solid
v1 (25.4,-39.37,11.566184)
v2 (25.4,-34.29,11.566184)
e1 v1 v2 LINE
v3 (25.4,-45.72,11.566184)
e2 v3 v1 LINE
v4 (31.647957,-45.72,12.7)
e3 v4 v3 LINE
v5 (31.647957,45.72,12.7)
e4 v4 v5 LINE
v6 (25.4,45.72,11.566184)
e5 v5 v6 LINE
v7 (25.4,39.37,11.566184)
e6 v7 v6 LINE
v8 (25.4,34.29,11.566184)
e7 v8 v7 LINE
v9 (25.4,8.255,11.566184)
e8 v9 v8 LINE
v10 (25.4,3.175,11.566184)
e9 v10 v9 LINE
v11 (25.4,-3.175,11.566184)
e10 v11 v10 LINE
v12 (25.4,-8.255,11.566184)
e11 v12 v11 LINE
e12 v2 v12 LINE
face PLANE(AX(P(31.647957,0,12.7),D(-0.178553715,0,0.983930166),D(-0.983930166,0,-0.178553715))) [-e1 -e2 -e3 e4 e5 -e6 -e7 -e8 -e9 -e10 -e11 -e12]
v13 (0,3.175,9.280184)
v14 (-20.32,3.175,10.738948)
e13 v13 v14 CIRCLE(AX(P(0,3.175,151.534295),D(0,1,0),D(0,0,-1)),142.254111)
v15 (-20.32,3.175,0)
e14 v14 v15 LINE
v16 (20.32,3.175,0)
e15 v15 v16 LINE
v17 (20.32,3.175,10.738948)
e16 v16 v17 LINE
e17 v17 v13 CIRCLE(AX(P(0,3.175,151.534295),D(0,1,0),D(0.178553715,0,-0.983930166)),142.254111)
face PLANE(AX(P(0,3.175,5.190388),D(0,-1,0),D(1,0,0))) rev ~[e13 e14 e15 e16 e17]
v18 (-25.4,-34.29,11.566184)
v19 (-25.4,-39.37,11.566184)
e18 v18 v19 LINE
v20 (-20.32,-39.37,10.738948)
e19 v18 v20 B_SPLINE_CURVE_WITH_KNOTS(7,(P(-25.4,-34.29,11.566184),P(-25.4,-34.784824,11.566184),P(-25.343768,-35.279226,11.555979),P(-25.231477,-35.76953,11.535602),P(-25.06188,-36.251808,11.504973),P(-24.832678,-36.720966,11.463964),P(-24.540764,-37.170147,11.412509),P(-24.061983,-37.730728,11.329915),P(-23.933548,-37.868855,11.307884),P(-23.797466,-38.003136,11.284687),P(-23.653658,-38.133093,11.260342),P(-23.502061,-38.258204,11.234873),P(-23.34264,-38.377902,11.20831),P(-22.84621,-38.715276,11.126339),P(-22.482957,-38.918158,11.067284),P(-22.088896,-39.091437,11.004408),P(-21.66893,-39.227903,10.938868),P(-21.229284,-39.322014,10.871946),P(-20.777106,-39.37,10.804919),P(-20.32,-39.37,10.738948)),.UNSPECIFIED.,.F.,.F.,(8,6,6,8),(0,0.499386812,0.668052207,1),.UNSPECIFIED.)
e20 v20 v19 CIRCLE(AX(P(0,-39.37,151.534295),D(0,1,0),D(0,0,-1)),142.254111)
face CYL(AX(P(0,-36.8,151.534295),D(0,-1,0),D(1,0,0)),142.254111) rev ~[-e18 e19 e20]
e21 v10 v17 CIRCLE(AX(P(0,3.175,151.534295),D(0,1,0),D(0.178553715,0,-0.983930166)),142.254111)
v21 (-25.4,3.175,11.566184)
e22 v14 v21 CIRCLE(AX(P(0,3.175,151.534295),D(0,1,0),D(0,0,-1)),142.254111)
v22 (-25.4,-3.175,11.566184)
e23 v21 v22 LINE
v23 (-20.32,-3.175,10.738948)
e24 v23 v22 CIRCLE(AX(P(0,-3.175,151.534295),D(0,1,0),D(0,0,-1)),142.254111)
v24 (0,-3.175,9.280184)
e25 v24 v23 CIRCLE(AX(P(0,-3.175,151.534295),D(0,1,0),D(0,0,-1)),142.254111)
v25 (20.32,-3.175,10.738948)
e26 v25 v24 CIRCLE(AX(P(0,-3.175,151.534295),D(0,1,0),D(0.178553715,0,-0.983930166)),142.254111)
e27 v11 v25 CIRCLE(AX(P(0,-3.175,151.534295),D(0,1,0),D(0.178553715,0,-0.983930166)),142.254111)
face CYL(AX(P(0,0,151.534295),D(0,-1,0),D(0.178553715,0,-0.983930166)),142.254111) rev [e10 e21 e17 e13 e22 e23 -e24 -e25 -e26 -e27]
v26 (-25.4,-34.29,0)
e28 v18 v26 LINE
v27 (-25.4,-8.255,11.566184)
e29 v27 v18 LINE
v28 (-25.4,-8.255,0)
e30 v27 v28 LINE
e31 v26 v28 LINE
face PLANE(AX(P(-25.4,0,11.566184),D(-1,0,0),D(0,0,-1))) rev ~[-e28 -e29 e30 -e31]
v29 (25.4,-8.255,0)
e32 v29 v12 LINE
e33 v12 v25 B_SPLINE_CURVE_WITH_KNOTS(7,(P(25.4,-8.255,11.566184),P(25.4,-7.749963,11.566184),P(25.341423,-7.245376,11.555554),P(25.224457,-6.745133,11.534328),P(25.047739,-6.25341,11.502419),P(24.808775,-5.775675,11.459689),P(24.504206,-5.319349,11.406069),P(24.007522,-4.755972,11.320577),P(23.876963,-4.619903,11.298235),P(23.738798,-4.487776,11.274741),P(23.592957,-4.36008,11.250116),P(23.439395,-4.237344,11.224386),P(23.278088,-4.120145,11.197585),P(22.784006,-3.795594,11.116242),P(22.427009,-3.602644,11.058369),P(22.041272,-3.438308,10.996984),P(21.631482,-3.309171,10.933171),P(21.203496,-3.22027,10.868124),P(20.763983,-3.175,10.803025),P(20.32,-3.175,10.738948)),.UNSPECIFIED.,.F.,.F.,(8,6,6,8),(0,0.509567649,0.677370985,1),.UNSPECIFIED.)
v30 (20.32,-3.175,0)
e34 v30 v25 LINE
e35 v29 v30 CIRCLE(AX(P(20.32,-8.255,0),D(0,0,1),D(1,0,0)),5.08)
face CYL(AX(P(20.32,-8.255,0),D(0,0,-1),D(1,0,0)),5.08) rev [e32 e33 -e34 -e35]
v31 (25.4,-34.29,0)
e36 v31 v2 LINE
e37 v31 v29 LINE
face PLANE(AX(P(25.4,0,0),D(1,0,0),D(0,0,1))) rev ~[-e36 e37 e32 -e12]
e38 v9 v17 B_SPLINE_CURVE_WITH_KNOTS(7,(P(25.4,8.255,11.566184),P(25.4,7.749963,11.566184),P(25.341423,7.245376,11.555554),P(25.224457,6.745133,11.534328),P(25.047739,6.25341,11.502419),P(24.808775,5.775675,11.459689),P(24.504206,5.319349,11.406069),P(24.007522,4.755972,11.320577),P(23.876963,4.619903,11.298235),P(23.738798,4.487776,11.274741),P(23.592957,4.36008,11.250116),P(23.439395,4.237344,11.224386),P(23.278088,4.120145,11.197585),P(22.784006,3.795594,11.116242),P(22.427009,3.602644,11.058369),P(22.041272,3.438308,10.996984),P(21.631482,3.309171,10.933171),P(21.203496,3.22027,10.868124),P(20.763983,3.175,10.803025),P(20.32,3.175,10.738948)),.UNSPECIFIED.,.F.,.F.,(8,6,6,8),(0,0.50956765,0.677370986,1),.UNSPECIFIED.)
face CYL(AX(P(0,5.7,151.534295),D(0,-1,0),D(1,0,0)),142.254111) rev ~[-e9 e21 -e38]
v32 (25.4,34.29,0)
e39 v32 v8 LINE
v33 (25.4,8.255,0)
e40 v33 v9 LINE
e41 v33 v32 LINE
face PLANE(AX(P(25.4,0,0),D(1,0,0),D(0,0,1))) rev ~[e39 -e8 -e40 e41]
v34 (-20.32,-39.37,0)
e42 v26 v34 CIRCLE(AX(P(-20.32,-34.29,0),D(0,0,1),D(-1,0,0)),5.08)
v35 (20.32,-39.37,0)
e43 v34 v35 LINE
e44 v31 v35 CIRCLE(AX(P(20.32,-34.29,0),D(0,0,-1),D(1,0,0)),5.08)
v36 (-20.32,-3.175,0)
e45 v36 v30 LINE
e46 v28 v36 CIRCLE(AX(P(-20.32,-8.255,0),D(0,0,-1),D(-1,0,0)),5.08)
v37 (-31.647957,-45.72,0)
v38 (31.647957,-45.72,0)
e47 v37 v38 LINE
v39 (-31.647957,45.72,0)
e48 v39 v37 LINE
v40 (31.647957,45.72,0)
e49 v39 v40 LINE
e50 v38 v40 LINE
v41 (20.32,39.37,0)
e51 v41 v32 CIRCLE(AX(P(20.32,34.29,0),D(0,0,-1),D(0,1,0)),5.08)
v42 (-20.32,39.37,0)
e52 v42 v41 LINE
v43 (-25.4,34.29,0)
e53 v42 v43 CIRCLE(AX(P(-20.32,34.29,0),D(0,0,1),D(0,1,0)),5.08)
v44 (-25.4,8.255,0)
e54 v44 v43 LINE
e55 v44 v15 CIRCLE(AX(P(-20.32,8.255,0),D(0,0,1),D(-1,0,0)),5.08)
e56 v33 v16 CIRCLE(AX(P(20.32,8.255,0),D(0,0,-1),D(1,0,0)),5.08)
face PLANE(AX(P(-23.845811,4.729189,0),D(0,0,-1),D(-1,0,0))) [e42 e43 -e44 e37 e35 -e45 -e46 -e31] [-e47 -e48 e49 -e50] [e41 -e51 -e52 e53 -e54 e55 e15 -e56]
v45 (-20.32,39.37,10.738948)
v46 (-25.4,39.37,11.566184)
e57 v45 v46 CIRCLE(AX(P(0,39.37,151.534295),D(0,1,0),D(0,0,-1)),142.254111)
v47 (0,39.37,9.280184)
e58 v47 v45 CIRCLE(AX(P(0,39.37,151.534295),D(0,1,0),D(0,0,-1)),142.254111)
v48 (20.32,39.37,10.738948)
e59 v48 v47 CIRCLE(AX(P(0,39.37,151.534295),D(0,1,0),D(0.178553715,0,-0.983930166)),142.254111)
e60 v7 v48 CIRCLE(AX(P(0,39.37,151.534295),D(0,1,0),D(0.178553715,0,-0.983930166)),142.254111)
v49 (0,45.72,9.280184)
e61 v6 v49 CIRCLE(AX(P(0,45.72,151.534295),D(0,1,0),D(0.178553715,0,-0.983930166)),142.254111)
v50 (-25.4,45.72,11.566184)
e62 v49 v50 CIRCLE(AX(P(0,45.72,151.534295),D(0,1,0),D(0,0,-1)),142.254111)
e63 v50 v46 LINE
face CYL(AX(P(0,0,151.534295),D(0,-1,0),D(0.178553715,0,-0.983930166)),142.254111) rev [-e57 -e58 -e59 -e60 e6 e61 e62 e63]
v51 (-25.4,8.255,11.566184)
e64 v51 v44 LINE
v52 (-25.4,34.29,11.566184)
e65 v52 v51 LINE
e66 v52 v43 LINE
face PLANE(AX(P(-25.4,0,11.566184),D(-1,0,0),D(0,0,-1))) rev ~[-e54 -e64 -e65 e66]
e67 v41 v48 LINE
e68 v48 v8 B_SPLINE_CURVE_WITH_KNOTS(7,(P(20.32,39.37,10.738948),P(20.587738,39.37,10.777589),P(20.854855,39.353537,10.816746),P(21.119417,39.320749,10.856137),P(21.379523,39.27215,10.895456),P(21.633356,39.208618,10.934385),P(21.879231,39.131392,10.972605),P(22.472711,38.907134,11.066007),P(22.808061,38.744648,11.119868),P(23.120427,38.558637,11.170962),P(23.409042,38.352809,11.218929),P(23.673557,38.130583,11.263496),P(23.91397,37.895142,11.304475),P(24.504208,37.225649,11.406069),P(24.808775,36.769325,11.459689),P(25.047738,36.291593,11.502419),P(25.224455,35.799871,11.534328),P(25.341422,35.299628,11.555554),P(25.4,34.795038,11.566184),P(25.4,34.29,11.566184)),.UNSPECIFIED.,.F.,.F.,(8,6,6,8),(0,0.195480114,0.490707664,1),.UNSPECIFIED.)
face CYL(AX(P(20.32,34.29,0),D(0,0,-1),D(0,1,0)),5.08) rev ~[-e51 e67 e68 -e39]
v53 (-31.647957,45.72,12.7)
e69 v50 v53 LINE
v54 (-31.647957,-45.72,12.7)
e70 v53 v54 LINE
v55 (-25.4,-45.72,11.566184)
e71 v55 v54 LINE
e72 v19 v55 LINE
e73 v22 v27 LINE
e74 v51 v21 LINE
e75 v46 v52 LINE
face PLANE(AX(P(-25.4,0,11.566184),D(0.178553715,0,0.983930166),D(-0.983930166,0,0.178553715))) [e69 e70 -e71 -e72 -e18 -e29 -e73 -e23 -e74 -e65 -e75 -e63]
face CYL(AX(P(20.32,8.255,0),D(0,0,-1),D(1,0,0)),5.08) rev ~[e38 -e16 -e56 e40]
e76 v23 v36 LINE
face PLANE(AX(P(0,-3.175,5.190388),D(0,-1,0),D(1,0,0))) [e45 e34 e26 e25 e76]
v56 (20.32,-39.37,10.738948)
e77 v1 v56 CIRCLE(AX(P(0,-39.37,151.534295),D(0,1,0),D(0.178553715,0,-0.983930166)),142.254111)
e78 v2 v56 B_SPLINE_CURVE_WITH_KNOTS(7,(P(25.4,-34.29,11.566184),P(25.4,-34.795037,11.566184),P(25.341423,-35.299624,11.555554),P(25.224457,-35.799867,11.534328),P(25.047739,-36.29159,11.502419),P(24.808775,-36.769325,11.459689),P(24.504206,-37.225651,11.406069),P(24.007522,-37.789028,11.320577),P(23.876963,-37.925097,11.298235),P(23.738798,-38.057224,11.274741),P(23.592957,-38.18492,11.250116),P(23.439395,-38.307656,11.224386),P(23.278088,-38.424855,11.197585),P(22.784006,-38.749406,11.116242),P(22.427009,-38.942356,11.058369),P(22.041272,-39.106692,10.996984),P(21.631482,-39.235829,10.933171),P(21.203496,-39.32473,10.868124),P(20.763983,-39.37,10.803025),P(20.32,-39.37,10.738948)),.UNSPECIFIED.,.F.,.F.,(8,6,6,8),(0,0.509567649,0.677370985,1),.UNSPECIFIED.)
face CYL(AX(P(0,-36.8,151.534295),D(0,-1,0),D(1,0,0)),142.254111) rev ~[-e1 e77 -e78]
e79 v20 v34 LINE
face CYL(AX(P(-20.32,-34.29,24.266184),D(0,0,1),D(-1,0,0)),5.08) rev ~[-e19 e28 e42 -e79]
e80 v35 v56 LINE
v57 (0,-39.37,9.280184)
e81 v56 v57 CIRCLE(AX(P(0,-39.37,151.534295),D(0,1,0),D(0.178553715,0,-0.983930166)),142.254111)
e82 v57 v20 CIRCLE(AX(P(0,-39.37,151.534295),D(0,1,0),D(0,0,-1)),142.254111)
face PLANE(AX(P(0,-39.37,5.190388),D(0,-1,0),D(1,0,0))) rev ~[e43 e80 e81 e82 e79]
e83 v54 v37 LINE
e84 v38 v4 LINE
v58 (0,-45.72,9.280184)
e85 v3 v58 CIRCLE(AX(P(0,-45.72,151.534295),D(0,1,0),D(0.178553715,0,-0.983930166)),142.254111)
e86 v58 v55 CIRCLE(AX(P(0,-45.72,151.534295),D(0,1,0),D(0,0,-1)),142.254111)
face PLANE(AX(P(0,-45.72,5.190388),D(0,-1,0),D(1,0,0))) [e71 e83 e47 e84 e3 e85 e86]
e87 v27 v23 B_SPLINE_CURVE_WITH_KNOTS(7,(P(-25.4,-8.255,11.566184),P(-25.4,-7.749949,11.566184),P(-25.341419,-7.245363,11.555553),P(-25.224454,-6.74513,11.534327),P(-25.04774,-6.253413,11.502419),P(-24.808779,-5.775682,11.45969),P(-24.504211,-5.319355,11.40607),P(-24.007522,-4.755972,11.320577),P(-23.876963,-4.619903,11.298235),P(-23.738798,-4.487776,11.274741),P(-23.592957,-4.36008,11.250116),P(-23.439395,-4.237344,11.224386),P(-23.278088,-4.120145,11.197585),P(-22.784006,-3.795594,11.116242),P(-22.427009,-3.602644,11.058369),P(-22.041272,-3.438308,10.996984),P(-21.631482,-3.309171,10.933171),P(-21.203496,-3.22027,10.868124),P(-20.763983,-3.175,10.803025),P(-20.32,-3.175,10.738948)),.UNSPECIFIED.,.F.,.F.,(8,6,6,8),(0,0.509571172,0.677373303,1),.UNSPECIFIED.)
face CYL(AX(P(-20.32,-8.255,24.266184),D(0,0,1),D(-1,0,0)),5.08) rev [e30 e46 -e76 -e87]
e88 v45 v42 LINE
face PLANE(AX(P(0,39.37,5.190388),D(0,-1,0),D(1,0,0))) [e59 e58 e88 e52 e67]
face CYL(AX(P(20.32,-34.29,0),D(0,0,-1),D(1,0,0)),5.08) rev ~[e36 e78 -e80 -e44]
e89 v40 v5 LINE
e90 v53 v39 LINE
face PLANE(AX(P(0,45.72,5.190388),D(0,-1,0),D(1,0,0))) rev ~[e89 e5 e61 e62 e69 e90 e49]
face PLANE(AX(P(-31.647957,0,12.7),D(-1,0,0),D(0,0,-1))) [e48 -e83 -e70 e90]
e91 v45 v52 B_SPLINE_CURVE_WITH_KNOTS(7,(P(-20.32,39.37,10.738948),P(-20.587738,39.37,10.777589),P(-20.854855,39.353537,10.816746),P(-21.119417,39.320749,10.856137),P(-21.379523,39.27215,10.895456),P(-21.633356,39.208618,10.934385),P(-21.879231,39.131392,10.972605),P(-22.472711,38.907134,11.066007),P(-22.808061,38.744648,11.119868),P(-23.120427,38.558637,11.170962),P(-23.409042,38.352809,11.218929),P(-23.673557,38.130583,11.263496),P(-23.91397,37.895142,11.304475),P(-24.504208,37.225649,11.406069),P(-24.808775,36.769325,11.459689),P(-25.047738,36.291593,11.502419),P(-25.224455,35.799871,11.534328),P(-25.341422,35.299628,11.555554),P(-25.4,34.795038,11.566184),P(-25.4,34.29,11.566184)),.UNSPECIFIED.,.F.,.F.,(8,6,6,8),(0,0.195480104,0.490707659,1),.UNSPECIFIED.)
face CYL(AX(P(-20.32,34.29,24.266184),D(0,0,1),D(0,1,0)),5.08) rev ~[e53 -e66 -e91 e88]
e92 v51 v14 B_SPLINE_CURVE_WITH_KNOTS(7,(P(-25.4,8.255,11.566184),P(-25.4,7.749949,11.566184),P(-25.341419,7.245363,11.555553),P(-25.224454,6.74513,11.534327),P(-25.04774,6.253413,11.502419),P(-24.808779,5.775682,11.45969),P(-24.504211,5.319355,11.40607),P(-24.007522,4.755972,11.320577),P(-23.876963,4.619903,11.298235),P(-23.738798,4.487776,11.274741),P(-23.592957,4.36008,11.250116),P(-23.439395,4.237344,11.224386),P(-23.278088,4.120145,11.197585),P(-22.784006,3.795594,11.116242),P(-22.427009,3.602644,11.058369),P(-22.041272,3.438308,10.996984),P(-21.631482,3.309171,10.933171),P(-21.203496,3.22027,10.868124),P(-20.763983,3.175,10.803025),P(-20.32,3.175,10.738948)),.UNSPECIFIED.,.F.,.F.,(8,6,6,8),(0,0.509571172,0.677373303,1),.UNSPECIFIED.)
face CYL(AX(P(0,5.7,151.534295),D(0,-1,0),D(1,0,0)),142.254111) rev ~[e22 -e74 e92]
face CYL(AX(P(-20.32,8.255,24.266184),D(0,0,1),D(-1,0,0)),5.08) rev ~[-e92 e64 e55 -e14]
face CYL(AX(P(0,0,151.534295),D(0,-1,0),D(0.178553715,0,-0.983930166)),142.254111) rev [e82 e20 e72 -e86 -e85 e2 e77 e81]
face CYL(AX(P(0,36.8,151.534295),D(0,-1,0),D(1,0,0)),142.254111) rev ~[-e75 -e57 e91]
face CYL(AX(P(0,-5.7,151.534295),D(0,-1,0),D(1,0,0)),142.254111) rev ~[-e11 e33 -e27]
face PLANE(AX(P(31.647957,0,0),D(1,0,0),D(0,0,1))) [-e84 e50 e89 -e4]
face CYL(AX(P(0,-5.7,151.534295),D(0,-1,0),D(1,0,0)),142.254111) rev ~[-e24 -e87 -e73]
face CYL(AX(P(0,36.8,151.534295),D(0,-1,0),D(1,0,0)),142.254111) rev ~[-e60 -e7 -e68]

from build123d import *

# Parameters (mm, degrees)
F1_DEPTH     = 45.72
F2_DEPTH     = 39.37
F3_DEPTH     = 3.175
F4_T4_DEPTH  = 24.2661839103
F4_S5_R      = 142.2541111111
F4_T6_DEPTH  = 14
F4_T10_DEPTH = 24.2661839103
F4_S11_R     = 142.2541111111
F4_T12_DEPTH = 14
F4_T16_DEPTH = 24.2661839103
F4_S17_R     = 142.2541111111
F4_T18_DEPTH = 14
F4_T22_DEPTH = 24.2661839103
F4_S23_R     = 142.2541111111
F4_T24_DEPTH = 14
F4_T28_DEPTH = 24.2661839103
F4_S29_R     = 142.2541111111
F4_T30_DEPTH = 14
F4_T34_DEPTH = 24.2661839103
F4_S35_R     = 142.2541111111
F4_T36_DEPTH = 14
F4_T40_DEPTH = 24.2661839103
F4_S41_R     = 142.2541111111
F4_T42_DEPTH = 14
F4_T46_DEPTH = 24.2661839103
F4_S47_R     = 142.2541111111
F4_T48_DEPTH = 14


# Not quite as in the source:
# - a fillet or chamfer that OpenCascade refuses, or shapes differently, is made with other operations: its cross-section is extruded or revolved along the edge and cut away or added


with BuildPart() as f1:
    # F0 (on Front) → F1 (new body, symmetric)
    with BuildSketch(Plane.XZ):
        with BuildLine():
            ThreePointArc((25.4, 11.5661839103), (12.7513312638, 9.8528365344), (0, 9.2801839103))
            ThreePointArc((0, 9.2801839103), (-12.7513312638, 9.8528365344), (-25.4, 11.5661839103))
            Line((-25.4, 11.5661839103), (-25.4, 0))
            Line((-25.4, 0), (25.4, 0))
            Line((25.4, 0), (25.4, 11.5661839103))
        make_face()
        Polygon((-25.4, 0), (-25.4, 11.5661839103), (-31.6479565519, 12.7), (-31.6479565519, 0), align=None)
        Polygon((31.6479565519, 12.7), (25.4, 11.5661839103), (25.4, 0), (31.6479565519, 0), align=None)
    extrude(amount=F1_DEPTH, both=True)

    # F0 (on Front) → F2 (cut, symmetric)
    with BuildSketch(Plane.XZ):
        with BuildLine():
            ThreePointArc((25.4, 11.5661839103), (12.7513312638, 9.8528365344), (0, 9.2801839103))
            ThreePointArc((0, 9.2801839103), (-12.7513312638, 9.8528365344), (-25.4, 11.5661839103))
            Line((-25.4, 11.5661839103), (-25.4, 0))
            Line((-25.4, 0), (25.4, 0))
            Line((25.4, 0), (25.4, 11.5661839103))
        make_face()
    extrude(amount=F2_DEPTH, both=True, mode=Mode.SUBTRACT)

    # F0 (on Front) → F3 (join, symmetric)
    with BuildSketch(Plane.XZ):
        with BuildLine():
            ThreePointArc((25.4, 11.5661839103), (12.7513312638, 9.8528365344), (0, 9.2801839103))
            ThreePointArc((0, 9.2801839103), (-12.7513312638, 9.8528365344), (-25.4, 11.5661839103))
            Line((-25.4, 11.5661839103), (-25.4, 0))
            Line((-25.4, 0), (25.4, 0))
            Line((25.4, 0), (25.4, 11.5661839103))
        make_face()
    extrude(amount=F3_DEPTH, both=True)

    # F4: fillet of radius 5.08 on 8 edges, made by hand


with BuildPart() as f4_tool2:
    # F4_s3 → F4_t4 (new body)
    with BuildSketch(Plane.XY.offset(24.2661839103)):
        with BuildLine():
            ThreePointArc((-20.32, 39.37), (-23.9121024484, 37.8821024484), (-25.4, 34.29))
            Line((-25.4, 34.29), (-25.4, 39.37))
            Line((-25.4, 39.37), (-20.32, 39.37))
        make_face()
    extrude(amount=-F4_T4_DEPTH)

    # F4_s5 → F4_t6 (cut, symmetric)
    with BuildSketch(Plane.XZ.offset(-36.8)):
        with Locations((0, 151.5342950214)):
            Circle(F4_S5_R)
    extrude(amount=F4_T6_DEPTH, both=True, mode=Mode.SUBTRACT)


with BuildPart() as f1_1:
    add(f1.part)

    # F4_t1: union F4_tool2
    add(f4_tool2.part)


with BuildPart() as f4_tool8:
    # F4_s9 → F4_t10 (new body)
    with BuildSketch(Plane.XY):
        with BuildLine():
            ThreePointArc((20.32, 39.37), (23.9121024484, 37.8821024484), (25.4, 34.29))
            Line((25.4, 34.29), (25.4, 39.37))
            Line((25.4, 39.37), (20.32, 39.37))
        make_face()
    extrude(amount=F4_T10_DEPTH)

    # F4_s11 → F4_t12 (cut, symmetric)
    with BuildSketch(Plane.XZ.offset(-36.8)):
        with Locations((0, 151.5342950214)):
            Circle(F4_S11_R)
    extrude(amount=F4_T12_DEPTH, both=True, mode=Mode.SUBTRACT)


with BuildPart() as f1_2:
    add(f1_1.part)

    # F4_t7: union F4_tool8
    add(f4_tool8.part)


with BuildPart() as f4_tool14:
    # F4_s15 → F4_t16 (new body)
    with BuildSketch(Plane.XY):
        with BuildLine():
            ThreePointArc((25.4, -8.255), (23.9121024484, -4.6628975516), (20.32, -3.175))
            Line((20.32, -3.175), (25.4, -3.175))
            Line((25.4, -3.175), (25.4, -8.255))
        make_face()
    extrude(amount=F4_T16_DEPTH)

    # F4_s17 → F4_t18 (cut, symmetric)
    with BuildSketch(Plane.XZ.offset(5.7)):
        with Locations((0, 151.5342950214)):
            Circle(F4_S17_R)
    extrude(amount=F4_T18_DEPTH, both=True, mode=Mode.SUBTRACT)


with BuildPart() as f1_3:
    add(f1_2.part)

    # F4_t13: union F4_tool14
    add(f4_tool14.part)


with BuildPart() as f4_tool20:
    # F4_s21 → F4_t22 (new body)
    with BuildSketch(Plane.XY.offset(24.2661839103)):
        with BuildLine():
            ThreePointArc((-25.4, -8.255), (-23.9121024484, -4.6628975516), (-20.32, -3.175))
            Line((-20.32, -3.175), (-25.4, -3.175))
            Line((-25.4, -3.175), (-25.4, -8.255))
        make_face()
    extrude(amount=-F4_T22_DEPTH)

    # F4_s23 → F4_t24 (cut, symmetric)
    with BuildSketch(Plane.XZ.offset(5.7)):
        with Locations((0, 151.5342950214)):
            Circle(F4_S23_R)
    extrude(amount=F4_T24_DEPTH, both=True, mode=Mode.SUBTRACT)


with BuildPart() as f1_4:
    add(f1_3.part)

    # F4_t19: union F4_tool20
    add(f4_tool20.part)


with BuildPart() as f4_tool26:
    # F4_s27 → F4_t28 (new body)
    with BuildSketch(Plane.XY):
        with BuildLine():
            ThreePointArc((25.4, 8.255), (23.9121024484, 4.6628975516), (20.32, 3.175))
            Line((20.32, 3.175), (25.4, 3.175))
            Line((25.4, 3.175), (25.4, 8.255))
        make_face()
    extrude(amount=F4_T28_DEPTH)

    # F4_s29 → F4_t30 (cut, symmetric)
    with BuildSketch(Plane.XZ.offset(-5.7)):
        with Locations((0, 151.5342950214)):
            Circle(F4_S29_R)
    extrude(amount=F4_T30_DEPTH, both=True, mode=Mode.SUBTRACT)


with BuildPart() as f1_5:
    add(f1_4.part)

    # F4_t25: union F4_tool26
    add(f4_tool26.part)


with BuildPart() as f4_tool32:
    # F4_s33 → F4_t34 (new body)
    with BuildSketch(Plane.XY):
        with BuildLine():
            ThreePointArc((25.4, -34.29), (23.9121024484, -37.8821024484), (20.32, -39.37))
            Line((20.32, -39.37), (25.4, -39.37))
            Line((25.4, -39.37), (25.4, -34.29))
        make_face()
    extrude(amount=F4_T34_DEPTH)

    # F4_s35 → F4_t36 (cut, symmetric)
    with BuildSketch(Plane.XZ.offset(36.8)):
        with Locations((0, 151.5342950214)):
            Circle(F4_S35_R)
    extrude(amount=F4_T36_DEPTH, both=True, mode=Mode.SUBTRACT)


with BuildPart() as f1_6:
    add(f1_5.part)

    # F4_t31: union F4_tool32
    add(f4_tool32.part)


with BuildPart() as f4_tool38:
    # F4_s39 → F4_t40 (new body)
    with BuildSketch(Plane.XY.offset(24.2661839103)):
        with BuildLine():
            ThreePointArc((-25.4, -34.29), (-23.9121024484, -37.8821024484), (-20.32, -39.37))
            Line((-20.32, -39.37), (-25.4, -39.37))
            Line((-25.4, -39.37), (-25.4, -34.29))
        make_face()
    extrude(amount=-F4_T40_DEPTH)

    # F4_s41 → F4_t42 (cut, symmetric)
    with BuildSketch(Plane.XZ.offset(36.8)):
        with Locations((0, 151.5342950214)):
            Circle(F4_S41_R)
    extrude(amount=F4_T42_DEPTH, both=True, mode=Mode.SUBTRACT)


with BuildPart() as f1_7:
    add(f1_6.part)

    # F4_t37: union F4_tool38
    add(f4_tool38.part)


with BuildPart() as f4_tool44:
    # F4_s45 → F4_t46 (new body)
    with BuildSketch(Plane.XY.offset(24.2661839103)):
        with BuildLine():
            ThreePointArc((-25.4, 8.255), (-23.9121024484, 4.6628975516), (-20.32, 3.175))
            Line((-20.32, 3.175), (-25.4, 3.175))
            Line((-25.4, 3.175), (-25.4, 8.255))
        make_face()
    extrude(amount=-F4_T46_DEPTH)

    # F4_s47 → F4_t48 (cut, symmetric)
    with BuildSketch(Plane.XZ.offset(-5.7)):
        with Locations((0, 151.5342950214)):
            Circle(F4_S47_R)
    extrude(amount=F4_T48_DEPTH, both=True, mode=Mode.SUBTRACT)


with BuildPart() as f1_8:
    add(f1_7.part)

    # F4_t43: union F4_tool44
    add(f4_tool44.part)


solid = f1_8.part
